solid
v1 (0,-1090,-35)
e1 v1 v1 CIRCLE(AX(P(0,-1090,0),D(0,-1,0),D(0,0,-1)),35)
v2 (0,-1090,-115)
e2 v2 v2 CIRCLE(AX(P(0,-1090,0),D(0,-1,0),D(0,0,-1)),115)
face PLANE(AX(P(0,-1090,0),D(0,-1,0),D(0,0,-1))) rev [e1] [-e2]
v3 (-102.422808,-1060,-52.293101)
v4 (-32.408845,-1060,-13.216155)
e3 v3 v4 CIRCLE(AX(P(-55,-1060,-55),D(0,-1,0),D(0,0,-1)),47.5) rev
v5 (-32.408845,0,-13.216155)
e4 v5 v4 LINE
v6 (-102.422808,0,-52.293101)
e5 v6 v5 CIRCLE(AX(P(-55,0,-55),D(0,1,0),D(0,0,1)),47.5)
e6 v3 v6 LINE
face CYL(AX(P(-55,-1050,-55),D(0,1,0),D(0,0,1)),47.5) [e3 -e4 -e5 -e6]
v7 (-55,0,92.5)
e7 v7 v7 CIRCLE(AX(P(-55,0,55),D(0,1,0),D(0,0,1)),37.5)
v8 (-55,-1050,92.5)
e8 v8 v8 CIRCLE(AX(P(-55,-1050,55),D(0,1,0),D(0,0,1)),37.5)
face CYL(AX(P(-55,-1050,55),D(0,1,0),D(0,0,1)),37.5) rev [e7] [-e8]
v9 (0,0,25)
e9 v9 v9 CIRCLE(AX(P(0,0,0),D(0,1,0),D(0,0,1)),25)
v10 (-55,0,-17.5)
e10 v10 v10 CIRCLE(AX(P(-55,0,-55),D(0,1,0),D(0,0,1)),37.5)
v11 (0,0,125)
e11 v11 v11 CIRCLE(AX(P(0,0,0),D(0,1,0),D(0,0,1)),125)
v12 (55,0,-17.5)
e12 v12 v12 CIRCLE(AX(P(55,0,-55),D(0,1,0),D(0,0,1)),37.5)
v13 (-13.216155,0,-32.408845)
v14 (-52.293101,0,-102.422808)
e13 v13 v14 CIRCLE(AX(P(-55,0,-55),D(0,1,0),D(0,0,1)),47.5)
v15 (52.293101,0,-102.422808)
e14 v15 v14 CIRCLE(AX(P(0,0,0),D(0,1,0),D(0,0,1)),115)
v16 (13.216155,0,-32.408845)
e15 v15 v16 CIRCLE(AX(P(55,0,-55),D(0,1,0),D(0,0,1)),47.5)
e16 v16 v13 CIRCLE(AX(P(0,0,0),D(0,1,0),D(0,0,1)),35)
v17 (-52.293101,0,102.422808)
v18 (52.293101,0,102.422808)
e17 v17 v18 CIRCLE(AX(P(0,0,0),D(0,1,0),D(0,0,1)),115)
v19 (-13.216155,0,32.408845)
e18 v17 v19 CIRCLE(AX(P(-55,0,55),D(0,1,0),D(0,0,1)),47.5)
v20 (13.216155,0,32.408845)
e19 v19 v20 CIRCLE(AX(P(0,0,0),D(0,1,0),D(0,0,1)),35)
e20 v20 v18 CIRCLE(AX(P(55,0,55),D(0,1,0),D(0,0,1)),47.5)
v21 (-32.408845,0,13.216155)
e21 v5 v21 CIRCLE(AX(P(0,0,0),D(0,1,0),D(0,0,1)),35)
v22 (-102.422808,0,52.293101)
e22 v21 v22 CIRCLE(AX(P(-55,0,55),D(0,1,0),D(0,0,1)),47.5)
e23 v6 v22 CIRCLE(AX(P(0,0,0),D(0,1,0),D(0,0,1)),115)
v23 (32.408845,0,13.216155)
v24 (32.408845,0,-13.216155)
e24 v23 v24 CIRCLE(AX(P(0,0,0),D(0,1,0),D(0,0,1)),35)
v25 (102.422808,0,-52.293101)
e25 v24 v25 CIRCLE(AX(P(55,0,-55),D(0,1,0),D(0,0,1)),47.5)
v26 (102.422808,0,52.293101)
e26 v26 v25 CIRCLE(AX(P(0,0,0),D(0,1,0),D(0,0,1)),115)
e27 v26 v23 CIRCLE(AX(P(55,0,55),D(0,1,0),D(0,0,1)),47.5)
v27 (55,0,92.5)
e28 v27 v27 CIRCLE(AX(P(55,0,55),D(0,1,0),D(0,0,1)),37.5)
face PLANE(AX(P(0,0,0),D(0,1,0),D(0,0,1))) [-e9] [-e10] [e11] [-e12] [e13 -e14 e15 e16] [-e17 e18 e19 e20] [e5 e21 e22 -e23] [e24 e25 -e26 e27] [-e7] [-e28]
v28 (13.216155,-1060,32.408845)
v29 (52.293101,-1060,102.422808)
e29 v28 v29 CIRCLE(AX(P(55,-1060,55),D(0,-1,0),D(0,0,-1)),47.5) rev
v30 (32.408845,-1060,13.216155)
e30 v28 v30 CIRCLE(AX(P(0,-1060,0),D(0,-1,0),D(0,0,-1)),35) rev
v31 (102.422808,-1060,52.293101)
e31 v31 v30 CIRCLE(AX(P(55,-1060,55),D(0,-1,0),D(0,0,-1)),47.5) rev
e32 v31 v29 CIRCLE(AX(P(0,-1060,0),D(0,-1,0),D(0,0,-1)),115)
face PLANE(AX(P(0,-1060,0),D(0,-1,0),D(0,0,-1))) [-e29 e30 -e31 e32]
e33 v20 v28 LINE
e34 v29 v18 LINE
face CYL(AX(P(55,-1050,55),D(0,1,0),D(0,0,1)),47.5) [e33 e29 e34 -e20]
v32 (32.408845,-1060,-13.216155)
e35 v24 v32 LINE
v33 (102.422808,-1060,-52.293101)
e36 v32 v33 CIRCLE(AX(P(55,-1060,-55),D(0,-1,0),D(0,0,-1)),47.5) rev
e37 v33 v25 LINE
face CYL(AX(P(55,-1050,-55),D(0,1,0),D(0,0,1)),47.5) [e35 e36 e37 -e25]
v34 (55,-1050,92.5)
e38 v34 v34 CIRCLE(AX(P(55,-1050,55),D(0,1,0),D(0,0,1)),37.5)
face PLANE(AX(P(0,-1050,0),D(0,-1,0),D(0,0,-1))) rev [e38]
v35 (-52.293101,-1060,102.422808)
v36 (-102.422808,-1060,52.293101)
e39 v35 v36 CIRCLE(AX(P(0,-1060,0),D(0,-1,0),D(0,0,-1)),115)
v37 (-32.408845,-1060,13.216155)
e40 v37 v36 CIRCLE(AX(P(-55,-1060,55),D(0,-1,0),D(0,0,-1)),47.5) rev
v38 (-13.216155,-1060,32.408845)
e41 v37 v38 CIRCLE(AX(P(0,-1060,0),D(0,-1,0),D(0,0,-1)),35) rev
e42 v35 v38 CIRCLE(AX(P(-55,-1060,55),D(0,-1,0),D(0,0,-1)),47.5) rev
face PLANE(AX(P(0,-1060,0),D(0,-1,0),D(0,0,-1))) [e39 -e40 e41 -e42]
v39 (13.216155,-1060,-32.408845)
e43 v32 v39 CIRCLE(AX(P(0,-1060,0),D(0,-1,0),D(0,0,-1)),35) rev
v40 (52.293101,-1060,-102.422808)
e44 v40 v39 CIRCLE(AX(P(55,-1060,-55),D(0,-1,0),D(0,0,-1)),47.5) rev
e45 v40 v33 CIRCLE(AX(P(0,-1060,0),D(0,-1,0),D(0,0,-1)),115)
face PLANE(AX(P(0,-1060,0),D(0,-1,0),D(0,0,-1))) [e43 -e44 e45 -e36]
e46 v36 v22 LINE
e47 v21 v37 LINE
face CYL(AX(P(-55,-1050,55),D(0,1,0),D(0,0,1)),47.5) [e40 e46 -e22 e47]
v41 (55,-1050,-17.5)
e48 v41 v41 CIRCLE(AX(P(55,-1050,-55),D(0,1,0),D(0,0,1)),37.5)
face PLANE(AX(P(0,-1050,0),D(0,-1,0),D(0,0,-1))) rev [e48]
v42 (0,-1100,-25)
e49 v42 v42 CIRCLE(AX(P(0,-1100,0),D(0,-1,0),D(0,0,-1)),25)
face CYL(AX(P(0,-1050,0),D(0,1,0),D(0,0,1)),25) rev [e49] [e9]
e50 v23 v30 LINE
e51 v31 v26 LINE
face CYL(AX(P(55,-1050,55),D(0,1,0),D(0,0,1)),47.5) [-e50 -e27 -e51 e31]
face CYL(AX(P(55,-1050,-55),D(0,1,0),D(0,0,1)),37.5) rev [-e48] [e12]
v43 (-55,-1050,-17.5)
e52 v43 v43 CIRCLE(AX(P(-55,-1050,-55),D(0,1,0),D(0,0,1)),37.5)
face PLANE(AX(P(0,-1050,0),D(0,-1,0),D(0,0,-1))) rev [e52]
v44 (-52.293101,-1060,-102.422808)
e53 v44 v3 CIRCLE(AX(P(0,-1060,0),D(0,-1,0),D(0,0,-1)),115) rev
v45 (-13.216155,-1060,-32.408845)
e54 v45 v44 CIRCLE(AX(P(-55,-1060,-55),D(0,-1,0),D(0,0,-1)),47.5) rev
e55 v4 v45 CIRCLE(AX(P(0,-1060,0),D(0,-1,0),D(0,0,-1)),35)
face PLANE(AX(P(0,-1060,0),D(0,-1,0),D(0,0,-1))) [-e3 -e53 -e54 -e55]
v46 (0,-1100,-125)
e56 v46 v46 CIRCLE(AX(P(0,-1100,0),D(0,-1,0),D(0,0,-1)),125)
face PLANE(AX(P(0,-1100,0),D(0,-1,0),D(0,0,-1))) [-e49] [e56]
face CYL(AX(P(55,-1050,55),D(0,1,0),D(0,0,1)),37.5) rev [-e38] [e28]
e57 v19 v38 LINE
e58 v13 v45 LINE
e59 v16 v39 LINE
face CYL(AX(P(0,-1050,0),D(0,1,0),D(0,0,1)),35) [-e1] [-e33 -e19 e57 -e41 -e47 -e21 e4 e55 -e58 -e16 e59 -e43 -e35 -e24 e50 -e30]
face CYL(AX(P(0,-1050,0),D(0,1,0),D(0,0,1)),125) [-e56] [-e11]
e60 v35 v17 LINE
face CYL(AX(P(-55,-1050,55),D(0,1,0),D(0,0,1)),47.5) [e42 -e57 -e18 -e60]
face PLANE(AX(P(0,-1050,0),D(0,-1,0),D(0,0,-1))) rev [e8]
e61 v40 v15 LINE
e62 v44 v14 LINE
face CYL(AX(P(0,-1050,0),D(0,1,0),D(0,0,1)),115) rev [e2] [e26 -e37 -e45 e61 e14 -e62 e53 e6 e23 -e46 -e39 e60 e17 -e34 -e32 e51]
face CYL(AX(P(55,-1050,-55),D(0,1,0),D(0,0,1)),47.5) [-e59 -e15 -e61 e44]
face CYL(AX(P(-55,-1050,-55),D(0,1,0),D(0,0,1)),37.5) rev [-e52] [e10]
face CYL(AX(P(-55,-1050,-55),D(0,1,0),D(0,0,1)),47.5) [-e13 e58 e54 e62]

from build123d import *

# Parameters (mm, degrees)
SKETCH1_R           = 125
SKETCH1_R_2         = 37.5
SKETCH1_R_3         = 25
BOSS_EXTRUDE1_DEPTH = 1050
SKETCH2_R           = 125
SKETCH2_R_2         = 25
BOSS_EXTRUDE2_DEPTH = 50
SHELL1_START        = -1090
SHELL1_DEPTH        = 1090
SHELL1_2_DEPTH      = 30


# Read off the part's stored shape, not the designer's step: Shell1
with BuildPart() as part:
    # Sketch1 → Boss-Extrude1 (new body)
    with BuildSketch(Plane(origin=(0, 0, 0), x_dir=(1, 0, 0), z_dir=(0, 1, 0))):
        with Locations(Location((0, 0, 0), (0, 0, 270))):
            Circle(SKETCH1_R)
        with Locations(Location((55, 55, 0), (0, 0, 270))):
            Circle(SKETCH1_R_2, mode=Mode.SUBTRACT)
        with Locations(Location((55, -55, 0), (0, 0, 270))):
            Circle(SKETCH1_R_2, mode=Mode.SUBTRACT)
        with Locations(Location((-55, -55, 0), (0, 0, 270))):
            Circle(SKETCH1_R_2, mode=Mode.SUBTRACT)
        with Locations(Location((-55, 55, 0), (0, 0, 270))):
            Circle(SKETCH1_R_2, mode=Mode.SUBTRACT)
        with Locations(Location((0, 0, 0), (0, 0, 270))):
            Circle(SKETCH1_R_3, mode=Mode.SUBTRACT)
    extrude(amount=-BOSS_EXTRUDE1_DEPTH)

    # Sketch2 → Boss-Extrude2 (add)
    with BuildSketch(Plane.XZ.offset(1050)):
        with Locations(Location((0, 0, 0), (0, 0, 90))):
            Circle(SKETCH2_R)
        with Locations(Location((0, 0, 0), (0, 0, 90))):
            Circle(SKETCH2_R_2, mode=Mode.SUBTRACT)
    extrude(amount=BOSS_EXTRUDE2_DEPTH)

    # Shell1 outline → Shell1 (cut)
    with BuildSketch(Plane(origin=(0, 0, 0), x_dir=(1, 0, 0), z_dir=(0, 1, 0)).offset(SHELL1_START)):
        with BuildLine():
            ThreePointArc((32.408845333, 13.216154667), (35, 0), (32.408845333, -13.216154667))
            ThreePointArc((32.408845333, -13.216154667), (78.149615303, -13.522954405), (102.422807797, -52.293101293))
            ThreePointArc((102.422807797, -52.293101293), (115, 0), (102.422807798, 52.293101293))
            ThreePointArc((102.422807798, 52.293101293), (78.149615303, 13.522954405), (32.408845333, 13.216154667))
        make_face()
        with BuildLine():
            ThreePointArc((-13.216154667, 32.408845333), (0, 35), (13.216154667, 32.408845333))
            ThreePointArc((13.216154667, 32.408845333), (13.522954405, 78.149615303), (52.293101293, 102.422807797))
            ThreePointArc((52.293101293, 102.422807797), (0, 115), (-52.293101293, 102.422807798))
            ThreePointArc((-52.293101293, 102.422807798), (-13.522954405, 78.149615303), (-13.216154667, 32.408845333))
        make_face()
        with BuildLine():
            ThreePointArc((52.293101293, -102.422807797), (13.522954405, -78.149615303), (13.216154667, -32.408845333))
            ThreePointArc((13.216154667, -32.408845333), (0, -35), (-13.216154667, -32.408845333))
            ThreePointArc((-13.216154667, -32.408845333), (-13.522954405, -78.149615303), (-52.293101293, -102.422807797))
            ThreePointArc((-52.293101293, -102.422807797), (0, -115), (52.293101293, -102.422807797))
        make_face()
        with BuildLine():
            ThreePointArc((-32.408845333, -13.216154667), (-35, 0), (-32.408845333, 13.216154667))
            ThreePointArc((-32.408845333, 13.216154667), (-78.149615303, 13.522954405), (-102.422807797, 52.293101293))
            ThreePointArc((-102.422807797, 52.293101293), (-115, 0), (-102.422807798, -52.293101293))
            ThreePointArc((-102.422807798, -52.293101293), (-78.149615303, -13.522954405), (-32.408845333, -13.216154667))
        make_face()
    extrude(amount=SHELL1_DEPTH, mode=Mode.SUBTRACT)

    # Shell1 2 outline → Shell1 2 (cut)
    with BuildSketch(Plane(origin=(0, 0, 0), x_dir=(1, 0, 0), z_dir=(0, 1, 0)).offset(SHELL1_START)):
        with BuildLine():
            ThreePointArc((13.216154667, 32.408845333), (24.748737342, 24.748737342), (32.408845333, 13.216154667))
            ThreePointArc((32.408845333, 13.216154667), (78.149615303, 13.522954405), (102.422807797, 52.293101293))
            ThreePointArc((102.422807797, 52.293101293), (81.317279836, 81.317279836), (52.293101293, 102.422807798))
            ThreePointArc((52.293101293, 102.422807798), (13.522954405, 78.149615303), (13.216154667, 32.408845333))
        make_face()
        with BuildLine():
            ThreePointArc((102.422807797, -52.293101293), (78.149615303, -13.522954405), (32.408845333, -13.216154667))
            ThreePointArc((32.408845333, -13.216154667), (24.748737342, -24.748737342), (13.216154667, -32.408845333))
            ThreePointArc((13.216154667, -32.408845333), (13.522954405, -78.149615303), (52.293101293, -102.422807797))
            ThreePointArc((52.293101293, -102.422807797), (81.317279836, -81.317279836), (102.422807797, -52.293101293))
        make_face()
        with BuildLine():
            ThreePointArc((-32.408845333, 13.216154667), (-24.748737342, 24.748737342), (-13.216154667, 32.408845333))
            ThreePointArc((-13.216154667, 32.408845333), (-13.522954405, 78.149615303), (-52.293101293, 102.422807797))
            ThreePointArc((-52.293101293, 102.422807797), (-81.317279836, 81.317279836), (-102.422807798, 52.293101293))
            ThreePointArc((-102.422807798, 52.293101293), (-78.149615303, 13.522954405), (-32.408845333, 13.216154667))
        make_face()
        with BuildLine():
            ThreePointArc((-52.293101293, -102.422807797), (-13.522954405, -78.149615303), (-13.216154667, -32.408845333))
            ThreePointArc((-13.216154667, -32.408845333), (-24.748737342, -24.748737342), (-32.408845333, -13.216154667))
            ThreePointArc((-32.408845333, -13.216154667), (-78.149615303, -13.522954405), (-102.422807797, -52.293101293))
            ThreePointArc((-102.422807797, -52.293101293), (-81.317279836, -81.317279836), (-52.293101293, -102.422807797))
        make_face()
    extrude(amount=SHELL1_2_DEPTH, mode=Mode.SUBTRACT)


solid = part.part
